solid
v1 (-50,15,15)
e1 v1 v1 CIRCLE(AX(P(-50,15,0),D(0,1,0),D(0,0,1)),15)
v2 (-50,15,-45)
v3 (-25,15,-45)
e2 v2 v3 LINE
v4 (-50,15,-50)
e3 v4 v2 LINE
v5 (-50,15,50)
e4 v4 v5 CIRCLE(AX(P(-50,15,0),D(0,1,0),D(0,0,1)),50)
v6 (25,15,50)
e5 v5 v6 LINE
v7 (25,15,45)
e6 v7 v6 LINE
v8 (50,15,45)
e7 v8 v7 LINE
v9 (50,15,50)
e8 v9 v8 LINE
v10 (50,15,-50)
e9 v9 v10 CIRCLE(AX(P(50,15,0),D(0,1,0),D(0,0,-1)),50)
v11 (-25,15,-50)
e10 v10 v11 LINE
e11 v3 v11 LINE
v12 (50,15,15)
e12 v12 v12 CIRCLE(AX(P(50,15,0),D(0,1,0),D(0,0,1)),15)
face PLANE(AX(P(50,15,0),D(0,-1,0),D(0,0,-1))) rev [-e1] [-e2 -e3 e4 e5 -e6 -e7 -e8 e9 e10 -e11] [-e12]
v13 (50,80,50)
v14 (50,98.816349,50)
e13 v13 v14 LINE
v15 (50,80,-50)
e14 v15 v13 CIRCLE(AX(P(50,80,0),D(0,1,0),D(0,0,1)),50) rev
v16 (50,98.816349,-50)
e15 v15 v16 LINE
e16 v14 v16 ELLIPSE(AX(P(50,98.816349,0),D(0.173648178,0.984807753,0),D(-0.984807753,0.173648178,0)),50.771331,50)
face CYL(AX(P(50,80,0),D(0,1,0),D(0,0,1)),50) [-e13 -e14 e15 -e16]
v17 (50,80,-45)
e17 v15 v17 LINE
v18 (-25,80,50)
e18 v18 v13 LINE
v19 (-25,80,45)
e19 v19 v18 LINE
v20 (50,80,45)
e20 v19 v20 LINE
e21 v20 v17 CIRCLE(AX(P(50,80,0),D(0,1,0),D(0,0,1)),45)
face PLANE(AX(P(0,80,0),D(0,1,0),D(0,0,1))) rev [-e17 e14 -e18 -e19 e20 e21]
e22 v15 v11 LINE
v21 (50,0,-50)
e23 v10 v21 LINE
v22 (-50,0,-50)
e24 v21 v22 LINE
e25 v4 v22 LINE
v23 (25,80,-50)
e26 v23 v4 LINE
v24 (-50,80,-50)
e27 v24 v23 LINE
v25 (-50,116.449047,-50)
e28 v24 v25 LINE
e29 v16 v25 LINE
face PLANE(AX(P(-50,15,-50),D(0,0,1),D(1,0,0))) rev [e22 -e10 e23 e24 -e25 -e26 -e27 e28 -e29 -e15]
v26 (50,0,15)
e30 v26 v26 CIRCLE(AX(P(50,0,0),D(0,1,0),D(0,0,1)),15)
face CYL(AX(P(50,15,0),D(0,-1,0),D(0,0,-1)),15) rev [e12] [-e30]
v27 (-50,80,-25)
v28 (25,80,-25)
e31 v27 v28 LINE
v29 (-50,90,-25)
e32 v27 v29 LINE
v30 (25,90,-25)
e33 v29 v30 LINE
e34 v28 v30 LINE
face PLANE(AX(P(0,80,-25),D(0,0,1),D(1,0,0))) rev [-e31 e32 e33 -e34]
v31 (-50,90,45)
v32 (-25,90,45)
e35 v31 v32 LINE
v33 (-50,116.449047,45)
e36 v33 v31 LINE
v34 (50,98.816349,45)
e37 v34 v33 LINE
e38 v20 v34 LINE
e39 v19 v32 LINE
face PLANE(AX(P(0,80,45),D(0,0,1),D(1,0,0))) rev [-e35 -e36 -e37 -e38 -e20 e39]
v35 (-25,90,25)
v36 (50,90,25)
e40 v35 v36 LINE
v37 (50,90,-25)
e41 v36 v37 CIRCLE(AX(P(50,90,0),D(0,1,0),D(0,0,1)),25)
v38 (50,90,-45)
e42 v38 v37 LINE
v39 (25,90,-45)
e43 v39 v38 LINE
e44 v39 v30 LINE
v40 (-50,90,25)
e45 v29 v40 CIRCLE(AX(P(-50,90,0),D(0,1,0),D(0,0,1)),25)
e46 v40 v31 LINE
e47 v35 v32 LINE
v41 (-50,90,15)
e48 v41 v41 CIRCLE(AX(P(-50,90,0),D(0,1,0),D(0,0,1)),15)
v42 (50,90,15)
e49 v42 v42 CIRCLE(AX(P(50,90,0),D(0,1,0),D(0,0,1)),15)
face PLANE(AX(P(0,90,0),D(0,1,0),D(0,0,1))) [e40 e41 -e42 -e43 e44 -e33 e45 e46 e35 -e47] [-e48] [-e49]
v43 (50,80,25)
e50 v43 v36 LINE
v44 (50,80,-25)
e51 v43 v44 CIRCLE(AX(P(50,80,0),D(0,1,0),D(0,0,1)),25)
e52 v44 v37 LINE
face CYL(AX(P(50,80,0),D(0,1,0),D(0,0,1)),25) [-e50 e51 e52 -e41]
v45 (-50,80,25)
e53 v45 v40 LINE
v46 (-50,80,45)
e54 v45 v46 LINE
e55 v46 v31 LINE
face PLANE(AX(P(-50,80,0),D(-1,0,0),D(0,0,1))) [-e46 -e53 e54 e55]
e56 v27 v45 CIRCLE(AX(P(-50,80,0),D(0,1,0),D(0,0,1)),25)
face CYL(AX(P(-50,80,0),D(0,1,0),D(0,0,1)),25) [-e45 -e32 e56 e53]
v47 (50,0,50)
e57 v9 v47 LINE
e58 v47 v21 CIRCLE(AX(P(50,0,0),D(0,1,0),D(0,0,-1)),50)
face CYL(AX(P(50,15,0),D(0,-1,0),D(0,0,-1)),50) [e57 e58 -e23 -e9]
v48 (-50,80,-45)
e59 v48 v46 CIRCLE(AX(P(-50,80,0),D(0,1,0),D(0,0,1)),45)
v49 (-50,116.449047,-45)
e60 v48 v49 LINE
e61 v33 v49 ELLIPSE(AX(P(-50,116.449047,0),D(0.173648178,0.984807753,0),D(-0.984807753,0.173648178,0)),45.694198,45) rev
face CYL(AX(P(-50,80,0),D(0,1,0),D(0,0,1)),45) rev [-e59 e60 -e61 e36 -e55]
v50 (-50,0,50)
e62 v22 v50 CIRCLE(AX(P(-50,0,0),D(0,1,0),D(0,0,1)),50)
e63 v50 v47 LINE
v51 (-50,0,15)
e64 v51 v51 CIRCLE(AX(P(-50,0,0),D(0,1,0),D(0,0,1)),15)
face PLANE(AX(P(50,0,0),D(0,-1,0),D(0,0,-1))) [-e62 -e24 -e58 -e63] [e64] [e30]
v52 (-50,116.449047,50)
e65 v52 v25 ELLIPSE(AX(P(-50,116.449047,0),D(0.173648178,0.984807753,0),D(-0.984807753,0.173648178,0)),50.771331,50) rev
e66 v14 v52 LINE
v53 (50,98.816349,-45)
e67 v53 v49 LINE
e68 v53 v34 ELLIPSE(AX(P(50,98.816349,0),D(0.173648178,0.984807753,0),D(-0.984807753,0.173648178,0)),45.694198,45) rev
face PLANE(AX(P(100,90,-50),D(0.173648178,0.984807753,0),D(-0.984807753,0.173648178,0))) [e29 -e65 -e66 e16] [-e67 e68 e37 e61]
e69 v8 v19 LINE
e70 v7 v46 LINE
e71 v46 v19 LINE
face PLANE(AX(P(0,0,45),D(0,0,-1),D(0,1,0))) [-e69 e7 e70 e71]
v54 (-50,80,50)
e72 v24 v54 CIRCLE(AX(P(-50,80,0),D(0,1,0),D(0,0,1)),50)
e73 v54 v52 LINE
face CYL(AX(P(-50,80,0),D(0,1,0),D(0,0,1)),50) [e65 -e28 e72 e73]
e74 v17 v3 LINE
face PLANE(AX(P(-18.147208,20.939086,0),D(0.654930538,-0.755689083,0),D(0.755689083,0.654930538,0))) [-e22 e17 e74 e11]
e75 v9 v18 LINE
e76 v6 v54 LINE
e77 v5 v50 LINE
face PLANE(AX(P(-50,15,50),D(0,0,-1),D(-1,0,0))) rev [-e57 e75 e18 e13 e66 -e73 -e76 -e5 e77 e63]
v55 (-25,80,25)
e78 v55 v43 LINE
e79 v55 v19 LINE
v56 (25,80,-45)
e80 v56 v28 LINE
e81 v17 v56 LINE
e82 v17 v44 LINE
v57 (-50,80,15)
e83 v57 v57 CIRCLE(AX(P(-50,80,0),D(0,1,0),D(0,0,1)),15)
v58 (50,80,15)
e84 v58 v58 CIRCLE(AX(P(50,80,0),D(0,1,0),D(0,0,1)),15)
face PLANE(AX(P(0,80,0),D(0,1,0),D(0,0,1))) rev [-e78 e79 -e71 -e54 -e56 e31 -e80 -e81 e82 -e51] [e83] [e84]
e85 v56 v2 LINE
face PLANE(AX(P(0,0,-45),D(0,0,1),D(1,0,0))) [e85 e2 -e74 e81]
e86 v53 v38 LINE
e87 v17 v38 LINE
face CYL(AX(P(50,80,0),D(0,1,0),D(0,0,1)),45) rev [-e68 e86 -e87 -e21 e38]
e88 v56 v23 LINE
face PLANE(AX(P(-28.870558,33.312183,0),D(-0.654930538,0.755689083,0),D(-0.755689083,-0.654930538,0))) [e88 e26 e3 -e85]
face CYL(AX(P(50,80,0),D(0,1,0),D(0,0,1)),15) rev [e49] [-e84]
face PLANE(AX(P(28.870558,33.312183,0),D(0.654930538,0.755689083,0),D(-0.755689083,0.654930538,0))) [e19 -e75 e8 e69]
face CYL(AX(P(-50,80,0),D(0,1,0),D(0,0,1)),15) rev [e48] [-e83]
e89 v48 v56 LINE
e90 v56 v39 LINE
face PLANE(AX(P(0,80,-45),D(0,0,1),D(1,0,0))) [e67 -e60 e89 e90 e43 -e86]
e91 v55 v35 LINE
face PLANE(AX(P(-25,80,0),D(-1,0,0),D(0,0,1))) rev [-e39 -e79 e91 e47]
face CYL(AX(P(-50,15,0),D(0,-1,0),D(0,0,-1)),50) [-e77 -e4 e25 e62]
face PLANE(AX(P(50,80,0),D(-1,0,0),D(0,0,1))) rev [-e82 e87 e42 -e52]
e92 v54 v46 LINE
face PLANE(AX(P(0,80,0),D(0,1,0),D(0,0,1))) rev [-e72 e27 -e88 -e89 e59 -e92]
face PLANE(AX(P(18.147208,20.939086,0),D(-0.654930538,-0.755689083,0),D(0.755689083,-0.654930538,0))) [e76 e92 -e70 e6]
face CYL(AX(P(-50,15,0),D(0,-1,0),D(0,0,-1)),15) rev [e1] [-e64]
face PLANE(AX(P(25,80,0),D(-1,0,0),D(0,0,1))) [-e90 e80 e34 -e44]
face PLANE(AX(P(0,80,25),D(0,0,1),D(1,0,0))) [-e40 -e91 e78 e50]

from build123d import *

# Parameters (mm, degrees)
SKETCH1_R               = 15
BOSS_EXTRUDE1_DEPTH     = 15
SKETCH2_R               = 15
SKETCH2_W               = 100
SKETCH2_H               = 5
BOSS_EXTRUDE4_DEPTH     = 10
SKETCH2_7_W             = 100
SKETCH2_7_H             = 5
BOSS_EXTRUDE5_DEPTH     = 40
CUT_EXTRUDE1_DEPTH      = 172.464281995
CUT_EXTRUDE1_DEPTH_BACK = 172.464281995
SKETCH8_OUTSIDE_W       = 253.73
SKETCH8_OUTSIDE_H       = 183.73
LOFT1_START             = 45
LOFT1_DEPTH             = 5
LOFT2_START             = -50
LOFT2_DEPTH             = 5


# Read off the part's stored shape, not the designer's step: Loft1, Loft2
with BuildPart() as part:
    # Sketch1 → Boss-Extrude1 (new body)
    with BuildSketch(Plane(origin=(0, 0, 0), x_dir=(1, 0, 0), z_dir=(0, 1, 0))):
        with BuildLine():
            Line((-50, -50), (50, -50))
            ThreePointArc((50, -50), (100, 0), (50, 50))
            Line((50, 50), (-50, 50))
            ThreePointArc((-50, 50), (-100, 0), (-50, -50))
        make_face()
        with Locations(Location((50, 0, 0), (0, 0, 270))):
            Circle(SKETCH1_R, mode=Mode.SUBTRACT)
        with Locations(Location((-50, 0, 0), (0, 0, 270))):
            Circle(SKETCH1_R, mode=Mode.SUBTRACT)
    extrude(amount=BOSS_EXTRUDE1_DEPTH)



with BuildPart() as body_2:
    # Sketch2 → Boss-Extrude4 (new body)
    # profile 1 of 5: a face of its own
    with BuildSketch(Plane(origin=(0, 90, 0), x_dir=(1, 0, 0), z_dir=(0, 1, 0))):
        with BuildLine():
            Line((50, 45), (25, 45))
            Line((25, 45), (25, 25))
            Line((25, 25), (-50, 25))
            ThreePointArc((-50, 25), (-75, 0), (-50, -25))
            Line((-50, -25), (-50, -43.396517183))
            Line((-50, -43.396517183), (-50, -45))
            Line((-50, -45), (-25, -45))
            Line((-25, -45), (-25, -25))
            Line((-25, -25), (50, -25))
            ThreePointArc((50, -25), (75, 0), (50, 25))
            Line((50, 25), (50, 45))
        make_face()
        with Locations(Location((-50, 0, 0), (0, 0, 270))):
            Circle(SKETCH2_R, mode=Mode.SUBTRACT)
        with Locations(Location((50, 0, 0), (0, 0, 270))):
            Circle(SKETCH2_R, mode=Mode.SUBTRACT)
    # profile 2 of 5: a face of its own
    with BuildSketch(Plane(origin=(0, 90, 0), x_dir=(1, 0, 0), z_dir=(0, 1, 0))):
        with Locations((0, 47.5)):
            Rectangle(SKETCH2_W, SKETCH2_H)
    # profile 3 of 5: a face of its own
    with BuildSketch(Plane(origin=(0, 90, 0), x_dir=(1, 0, 0), z_dir=(0, 1, 0))):
        with BuildLine():
            ThreePointArc((-50, 45), (-95, 0), (-50, -45))
            Line((-50, -45), (-50, -50))
            ThreePointArc((-50, -50), (-100, 0), (-50, 50))
            Line((-50, 50), (-50, 45))
        make_face()
    # profile 4 of 5: a face of its own
    with BuildSketch(Plane(origin=(0, 90, 0), x_dir=(1, 0, 0), z_dir=(0, 1, 0))):
        with BuildLine():
            ThreePointArc((50, -45), (95, 0), (50, 45))
            Line((50, 45), (50, 50))
            ThreePointArc((50, 50), (100, 0), (50, -50))
            Line((50, -50), (50, -45))
        make_face()
    # profile 5 of 5: a face of its own
    with BuildSketch(Plane(origin=(0, 90, 0), x_dir=(1, 0, 0), z_dir=(0, 1, 0))):
        with Locations((0, -47.5)):
            Rectangle(SKETCH2_W, SKETCH2_H)
    extrude(amount=-BOSS_EXTRUDE4_DEPTH)

    # Sketch2<7> → Boss-Extrude5 (add)
    with BuildSketch(Plane(origin=(0, 90, 0), x_dir=(1, 0, 0), z_dir=(0, 1, 0))):
        with Locations((0, 47.5)):
            Rectangle(SKETCH2_7_W, SKETCH2_7_H)
        with BuildLine():
            ThreePointArc((50, -45), (95, 0), (50, 45))
            Line((50, 45), (50, 50))
            ThreePointArc((50, 50), (100, 0), (50, -50))
            Line((50, -50), (50, -45))
        make_face()
        with Locations((0, -47.5)):
            Rectangle(SKETCH2_7_W, SKETCH2_7_H)
        with BuildLine():
            ThreePointArc((-50, 45), (-95, 0), (-50, -45))
            Line((-50, -45), (-50, -50))
            ThreePointArc((-50, -50), (-100, 0), (-50, 50))
            Line((-50, 50), (-50, 45))
        make_face()
    extrude(amount=BOSS_EXTRUDE5_DEPTH)

    # Sketch8 outside → Cut-Extrude1 (cut, two sides: drawn at the far end of the back side and taken through both)
    with BuildSketch(Plane.XY.offset(-CUT_EXTRUDE1_DEPTH_BACK)):
        with Locations((0, 65)):
            Rectangle(SKETCH8_OUTSIDE_W, SKETCH8_OUTSIDE_H)
        Polygon((100, 90), (-100, 125.265396142), (-100, 0), (100, 0), align=None, mode=Mode.SUBTRACT)
    extrude(amount=CUT_EXTRUDE1_DEPTH + CUT_EXTRUDE1_DEPTH_BACK, mode=Mode.SUBTRACT)


with BuildPart() as part_1:
    add(part.part)

    add(body_2.part)  # Loft1 merges body 2
    # Loft1 outline → Loft1 (add)
    with BuildSketch(Plane.XY.offset(LOFT1_START)):
        Polygon((-25, 80), (-50, 80), (25, 15), (50, 15), align=None)
    extrude(amount=LOFT1_DEPTH)

    # Loft2 outline → Loft2 (add)
    with BuildSketch(Plane.XY.offset(LOFT2_START)):
        Polygon((-50, 15), (-25, 15), (50, 80), (25, 80), align=None)
    extrude(amount=LOFT2_DEPTH)


solid = part_1.part
